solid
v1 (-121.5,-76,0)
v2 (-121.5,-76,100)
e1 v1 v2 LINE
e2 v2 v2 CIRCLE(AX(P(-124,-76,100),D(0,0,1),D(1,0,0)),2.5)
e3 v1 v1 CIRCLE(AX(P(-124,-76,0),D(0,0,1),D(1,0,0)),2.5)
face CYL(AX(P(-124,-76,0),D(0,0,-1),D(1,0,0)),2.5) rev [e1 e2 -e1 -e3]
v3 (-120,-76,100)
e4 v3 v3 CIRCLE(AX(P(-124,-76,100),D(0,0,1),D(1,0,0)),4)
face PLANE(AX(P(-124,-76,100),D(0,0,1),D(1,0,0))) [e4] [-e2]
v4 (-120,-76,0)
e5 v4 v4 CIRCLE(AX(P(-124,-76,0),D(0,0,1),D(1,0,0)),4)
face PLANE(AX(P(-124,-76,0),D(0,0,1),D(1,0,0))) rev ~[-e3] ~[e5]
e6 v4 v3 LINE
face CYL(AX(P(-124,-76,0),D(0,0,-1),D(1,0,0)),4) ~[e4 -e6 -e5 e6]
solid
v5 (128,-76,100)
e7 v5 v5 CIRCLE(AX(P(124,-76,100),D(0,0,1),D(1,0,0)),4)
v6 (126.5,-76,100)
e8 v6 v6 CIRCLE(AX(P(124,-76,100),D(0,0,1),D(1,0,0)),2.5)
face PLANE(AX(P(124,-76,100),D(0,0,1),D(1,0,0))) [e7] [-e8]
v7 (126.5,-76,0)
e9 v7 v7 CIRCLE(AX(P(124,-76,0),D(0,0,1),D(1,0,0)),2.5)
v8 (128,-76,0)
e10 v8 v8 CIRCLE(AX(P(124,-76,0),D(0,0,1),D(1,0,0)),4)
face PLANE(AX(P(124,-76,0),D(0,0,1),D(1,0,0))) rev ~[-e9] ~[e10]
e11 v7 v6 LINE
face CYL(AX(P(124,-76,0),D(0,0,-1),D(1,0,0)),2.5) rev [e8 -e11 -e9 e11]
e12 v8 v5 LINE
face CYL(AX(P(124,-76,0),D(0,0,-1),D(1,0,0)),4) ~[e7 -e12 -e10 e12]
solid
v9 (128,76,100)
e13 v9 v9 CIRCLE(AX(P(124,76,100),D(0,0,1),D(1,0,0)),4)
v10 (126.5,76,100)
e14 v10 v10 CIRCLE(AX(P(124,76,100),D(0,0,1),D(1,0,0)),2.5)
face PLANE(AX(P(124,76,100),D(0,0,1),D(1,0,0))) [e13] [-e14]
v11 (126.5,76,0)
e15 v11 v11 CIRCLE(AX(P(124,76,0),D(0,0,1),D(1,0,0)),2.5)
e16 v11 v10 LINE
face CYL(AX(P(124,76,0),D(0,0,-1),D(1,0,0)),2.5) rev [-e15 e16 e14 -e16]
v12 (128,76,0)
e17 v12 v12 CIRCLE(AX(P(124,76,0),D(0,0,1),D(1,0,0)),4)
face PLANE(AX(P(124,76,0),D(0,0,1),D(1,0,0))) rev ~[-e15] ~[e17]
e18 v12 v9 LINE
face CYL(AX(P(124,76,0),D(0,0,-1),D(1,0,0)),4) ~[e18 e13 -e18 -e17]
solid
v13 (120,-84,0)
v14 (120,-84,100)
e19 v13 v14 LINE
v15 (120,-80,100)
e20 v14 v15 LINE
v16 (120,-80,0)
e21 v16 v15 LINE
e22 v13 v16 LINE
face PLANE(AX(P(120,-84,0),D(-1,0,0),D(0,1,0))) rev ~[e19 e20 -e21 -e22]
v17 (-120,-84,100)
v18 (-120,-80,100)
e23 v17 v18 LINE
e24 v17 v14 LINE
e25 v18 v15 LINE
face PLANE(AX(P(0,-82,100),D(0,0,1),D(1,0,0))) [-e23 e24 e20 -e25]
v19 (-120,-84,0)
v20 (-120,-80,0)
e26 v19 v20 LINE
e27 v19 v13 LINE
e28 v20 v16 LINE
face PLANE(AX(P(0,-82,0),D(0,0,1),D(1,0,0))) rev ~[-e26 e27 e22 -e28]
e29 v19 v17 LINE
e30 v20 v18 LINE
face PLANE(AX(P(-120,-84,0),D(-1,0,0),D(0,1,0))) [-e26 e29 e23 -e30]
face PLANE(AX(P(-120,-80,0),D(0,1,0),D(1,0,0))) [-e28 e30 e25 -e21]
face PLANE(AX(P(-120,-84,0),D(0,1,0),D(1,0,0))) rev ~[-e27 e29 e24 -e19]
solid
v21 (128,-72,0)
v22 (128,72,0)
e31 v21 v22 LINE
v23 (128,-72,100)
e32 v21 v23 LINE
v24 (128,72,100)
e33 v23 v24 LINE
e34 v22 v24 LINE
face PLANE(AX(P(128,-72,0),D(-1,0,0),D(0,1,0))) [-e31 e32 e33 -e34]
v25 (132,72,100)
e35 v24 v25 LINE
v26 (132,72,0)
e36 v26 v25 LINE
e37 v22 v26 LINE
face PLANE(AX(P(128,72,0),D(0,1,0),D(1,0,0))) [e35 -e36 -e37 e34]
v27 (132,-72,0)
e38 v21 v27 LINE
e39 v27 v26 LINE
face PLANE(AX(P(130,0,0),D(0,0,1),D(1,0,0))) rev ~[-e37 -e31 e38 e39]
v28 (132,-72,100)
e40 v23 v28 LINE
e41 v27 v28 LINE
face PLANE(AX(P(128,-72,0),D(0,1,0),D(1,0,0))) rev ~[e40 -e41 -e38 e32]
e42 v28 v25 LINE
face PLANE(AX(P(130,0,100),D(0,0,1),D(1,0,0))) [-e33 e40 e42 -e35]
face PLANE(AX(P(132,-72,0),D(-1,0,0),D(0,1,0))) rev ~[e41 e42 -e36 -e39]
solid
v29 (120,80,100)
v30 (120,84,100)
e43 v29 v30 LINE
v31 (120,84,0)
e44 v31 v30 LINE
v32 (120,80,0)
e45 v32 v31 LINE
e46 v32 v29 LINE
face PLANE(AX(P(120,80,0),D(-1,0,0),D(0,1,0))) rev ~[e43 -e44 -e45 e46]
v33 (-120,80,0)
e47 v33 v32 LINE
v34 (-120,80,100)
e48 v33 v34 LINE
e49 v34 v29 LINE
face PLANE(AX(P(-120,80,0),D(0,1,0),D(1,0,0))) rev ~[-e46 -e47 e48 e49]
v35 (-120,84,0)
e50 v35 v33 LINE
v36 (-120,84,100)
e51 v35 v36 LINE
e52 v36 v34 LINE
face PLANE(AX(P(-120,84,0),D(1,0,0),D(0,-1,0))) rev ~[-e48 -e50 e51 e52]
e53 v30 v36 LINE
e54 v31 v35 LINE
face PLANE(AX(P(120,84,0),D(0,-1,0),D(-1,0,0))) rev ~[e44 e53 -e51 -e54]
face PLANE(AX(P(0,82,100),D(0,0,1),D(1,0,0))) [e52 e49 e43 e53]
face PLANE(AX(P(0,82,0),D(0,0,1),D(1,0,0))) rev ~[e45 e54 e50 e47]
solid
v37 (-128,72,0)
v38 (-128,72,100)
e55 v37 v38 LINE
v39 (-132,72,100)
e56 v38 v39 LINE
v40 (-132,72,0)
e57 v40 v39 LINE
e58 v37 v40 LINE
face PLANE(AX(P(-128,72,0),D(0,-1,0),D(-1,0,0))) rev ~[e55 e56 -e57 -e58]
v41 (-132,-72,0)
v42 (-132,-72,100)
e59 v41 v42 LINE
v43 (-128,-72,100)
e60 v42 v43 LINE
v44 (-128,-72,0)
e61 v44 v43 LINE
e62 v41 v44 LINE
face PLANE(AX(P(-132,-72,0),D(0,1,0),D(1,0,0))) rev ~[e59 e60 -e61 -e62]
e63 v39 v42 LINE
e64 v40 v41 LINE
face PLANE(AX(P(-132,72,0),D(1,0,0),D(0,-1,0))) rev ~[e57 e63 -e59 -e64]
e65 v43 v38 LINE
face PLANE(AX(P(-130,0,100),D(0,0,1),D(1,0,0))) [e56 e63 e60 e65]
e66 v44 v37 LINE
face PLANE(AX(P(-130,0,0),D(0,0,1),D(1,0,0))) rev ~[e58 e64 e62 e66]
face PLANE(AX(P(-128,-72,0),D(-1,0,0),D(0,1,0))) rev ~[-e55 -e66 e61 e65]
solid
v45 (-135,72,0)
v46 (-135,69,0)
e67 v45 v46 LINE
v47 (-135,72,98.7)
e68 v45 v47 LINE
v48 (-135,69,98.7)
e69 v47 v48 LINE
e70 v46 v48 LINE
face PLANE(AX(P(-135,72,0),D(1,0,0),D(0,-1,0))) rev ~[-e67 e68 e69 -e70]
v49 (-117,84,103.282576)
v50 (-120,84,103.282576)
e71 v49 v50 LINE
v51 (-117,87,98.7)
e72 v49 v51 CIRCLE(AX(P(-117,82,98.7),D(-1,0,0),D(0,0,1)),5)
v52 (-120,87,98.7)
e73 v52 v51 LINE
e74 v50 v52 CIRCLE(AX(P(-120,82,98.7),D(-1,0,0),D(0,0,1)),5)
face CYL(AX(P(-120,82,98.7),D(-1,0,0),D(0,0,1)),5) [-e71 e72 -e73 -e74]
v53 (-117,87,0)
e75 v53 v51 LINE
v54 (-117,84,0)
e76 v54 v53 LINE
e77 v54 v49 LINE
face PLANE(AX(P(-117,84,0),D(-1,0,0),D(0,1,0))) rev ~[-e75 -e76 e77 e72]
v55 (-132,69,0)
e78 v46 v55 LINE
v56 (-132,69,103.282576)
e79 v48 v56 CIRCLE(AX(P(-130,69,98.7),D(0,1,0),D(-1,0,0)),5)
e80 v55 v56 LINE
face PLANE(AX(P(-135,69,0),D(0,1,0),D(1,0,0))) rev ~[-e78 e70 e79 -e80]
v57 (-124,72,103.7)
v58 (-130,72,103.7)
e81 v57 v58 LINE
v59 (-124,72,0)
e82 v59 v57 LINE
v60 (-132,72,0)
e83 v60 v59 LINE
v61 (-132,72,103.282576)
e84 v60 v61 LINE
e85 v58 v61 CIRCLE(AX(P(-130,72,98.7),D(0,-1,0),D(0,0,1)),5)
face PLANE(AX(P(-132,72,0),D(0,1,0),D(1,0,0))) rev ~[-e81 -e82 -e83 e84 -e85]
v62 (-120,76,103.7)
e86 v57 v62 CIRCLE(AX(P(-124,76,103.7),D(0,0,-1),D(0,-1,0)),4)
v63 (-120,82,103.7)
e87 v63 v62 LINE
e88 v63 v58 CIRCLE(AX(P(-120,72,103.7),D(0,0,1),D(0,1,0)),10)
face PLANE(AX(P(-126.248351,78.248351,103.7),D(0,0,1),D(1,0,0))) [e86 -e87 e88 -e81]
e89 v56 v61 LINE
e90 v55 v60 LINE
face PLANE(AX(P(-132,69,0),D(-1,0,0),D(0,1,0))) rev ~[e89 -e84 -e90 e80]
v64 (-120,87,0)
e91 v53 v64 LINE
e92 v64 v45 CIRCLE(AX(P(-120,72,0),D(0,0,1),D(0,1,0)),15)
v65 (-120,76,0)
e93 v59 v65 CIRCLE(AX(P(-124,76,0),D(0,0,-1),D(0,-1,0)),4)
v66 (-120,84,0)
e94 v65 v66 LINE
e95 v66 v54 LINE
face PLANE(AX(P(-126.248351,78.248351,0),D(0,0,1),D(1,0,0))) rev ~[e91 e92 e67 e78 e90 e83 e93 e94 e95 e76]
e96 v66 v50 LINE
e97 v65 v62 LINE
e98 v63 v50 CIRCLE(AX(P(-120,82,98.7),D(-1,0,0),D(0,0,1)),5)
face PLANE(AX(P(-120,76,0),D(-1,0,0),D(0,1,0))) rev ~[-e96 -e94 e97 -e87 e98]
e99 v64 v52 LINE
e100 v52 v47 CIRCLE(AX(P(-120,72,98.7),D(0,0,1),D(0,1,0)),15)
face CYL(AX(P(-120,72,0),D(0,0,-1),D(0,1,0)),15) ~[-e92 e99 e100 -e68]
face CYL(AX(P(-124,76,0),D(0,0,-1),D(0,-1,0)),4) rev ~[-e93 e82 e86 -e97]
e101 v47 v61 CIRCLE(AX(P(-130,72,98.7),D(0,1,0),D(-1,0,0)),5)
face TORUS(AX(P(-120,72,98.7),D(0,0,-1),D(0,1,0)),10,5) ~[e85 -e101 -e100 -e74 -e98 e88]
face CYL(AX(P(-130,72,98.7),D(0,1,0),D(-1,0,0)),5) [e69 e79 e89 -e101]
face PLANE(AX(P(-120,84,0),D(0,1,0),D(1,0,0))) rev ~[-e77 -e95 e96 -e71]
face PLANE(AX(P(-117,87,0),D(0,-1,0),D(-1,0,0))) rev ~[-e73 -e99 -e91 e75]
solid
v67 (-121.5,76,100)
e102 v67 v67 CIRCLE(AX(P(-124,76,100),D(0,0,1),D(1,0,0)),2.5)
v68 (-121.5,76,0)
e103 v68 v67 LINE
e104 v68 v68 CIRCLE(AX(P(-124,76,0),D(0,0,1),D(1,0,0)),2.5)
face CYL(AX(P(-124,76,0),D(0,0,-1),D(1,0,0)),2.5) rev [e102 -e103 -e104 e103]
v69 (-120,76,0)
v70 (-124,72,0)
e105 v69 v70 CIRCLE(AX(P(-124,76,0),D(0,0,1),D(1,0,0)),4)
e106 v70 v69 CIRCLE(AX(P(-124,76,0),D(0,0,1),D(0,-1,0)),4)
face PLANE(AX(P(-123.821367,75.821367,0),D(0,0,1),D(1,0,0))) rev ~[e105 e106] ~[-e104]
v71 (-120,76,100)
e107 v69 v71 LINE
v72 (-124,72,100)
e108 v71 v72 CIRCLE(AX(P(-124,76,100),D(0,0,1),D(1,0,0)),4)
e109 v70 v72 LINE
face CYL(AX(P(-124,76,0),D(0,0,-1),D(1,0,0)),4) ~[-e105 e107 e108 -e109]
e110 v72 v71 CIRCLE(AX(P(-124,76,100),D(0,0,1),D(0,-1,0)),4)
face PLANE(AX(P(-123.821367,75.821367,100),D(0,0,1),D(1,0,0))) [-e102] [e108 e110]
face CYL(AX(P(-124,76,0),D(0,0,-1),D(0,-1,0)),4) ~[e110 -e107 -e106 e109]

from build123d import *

# Parameters (mm, degrees)
F0_R        = 2.5
F1_DEPTH    = 100
F0_R_2      = 4
F0_W        = 240
F0_H        = 4
F0_W_2      = 4
F0_H_2      = 144
F2_DEPTH    = 103.7
F3_T1_DEPTH = 15.5
F3_T3_DEPTH = 15.5
F3_T6_ANGLE = 90


# Not quite as in the source:
# - a fillet or chamfer that OpenCascade refuses, or shapes differently, is made with other operations: its cross-section is extruded or revolved along the edge and cut away or added


with BuildPart() as f1:
    # F0 (on Top) → F1 (new body)
    with BuildSketch(Plane.XY):
        with BuildLine():
            ThreePointArc((-124, 72), (-121.1715728753, 73.1715728753), (-120, 76))
            ThreePointArc((-120, 76), (-126.8284271247, 78.8284271247), (-124, 72))
        make_face()
        with Locations((-124, 76)):
            Circle(F0_R, mode=Mode.SUBTRACT)
    extrude(amount=F1_DEPTH)


with BuildPart() as f1b:
    # F0 (on Top) → F1, piece 2 (new body)
    with BuildSketch(Plane.XY):
        with Locations((-124, -76)):
            Circle(F0_R_2)
        with Locations((-124, -76)):
            Circle(F0_R, mode=Mode.SUBTRACT)
    extrude(amount=F1_DEPTH)


with BuildPart() as f1c:
    # F0 (on Top) → F1, piece 3 (new body)
    with BuildSketch(Plane.XY):
        with Locations((124, -76)):
            Circle(F0_R_2)
        with Locations((124, -76)):
            Circle(F0_R, mode=Mode.SUBTRACT)
    extrude(amount=F1_DEPTH)


with BuildPart() as f1d:
    # F0 (on Top) → F1, piece 4 (new body)
    with BuildSketch(Plane.XY):
        with Locations((124, 76)):
            Circle(F0_R_2)
        with Locations((124, 76)):
            Circle(F0_R, mode=Mode.SUBTRACT)
    extrude(amount=F1_DEPTH)


with BuildPart() as f1e:
    # F0 (on Top) → F1, piece 5 (new body)
    with BuildSketch(Plane.XY):
        Polygon((-120, 84), (-120, 80), (120, 80), (120, 84), (-117, 84), align=None)
    extrude(amount=F1_DEPTH)


with BuildPart() as f1f:
    # F0 (on Top) → F1, piece 6 (new body)
    with BuildSketch(Plane.XY):
        Polygon((-128, -72), (-128, 72), (-132, 72), (-132, 69), (-132, -72), align=None)
    extrude(amount=F1_DEPTH)


with BuildPart() as f1g:
    # F0 (on Top) → F1, piece 7 (new body)
    with BuildSketch(Plane.XY):
        with Locations((0, -82)):
            Rectangle(F0_W, F0_H)
    extrude(amount=F1_DEPTH)


with BuildPart() as f1h:
    # F0 (on Top) → F1, piece 8 (new body)
    with BuildSketch(Plane.XY):
        with Locations((130, 0)):
            Rectangle(F0_W_2, F0_H_2)
    extrude(amount=F1_DEPTH)


with BuildPart() as f2:
    # F0 (on Top) → F2 (new body)
    with BuildSketch(Plane.XY):
        with BuildLine():
            ThreePointArc((-124, 72), (-126.8284271247, 78.8284271247), (-120, 76))
            Line((-120, 76), (-120, 80))
            Line((-120, 80), (-120, 84))
            Line((-120, 84), (-117, 84))
            Line((-117, 84), (-117, 87))
            Line((-117, 87), (-120, 87))
            ThreePointArc((-120, 87), (-130.6066017178, 82.6066017178), (-135, 72))
            Line((-135, 72), (-135, 69))
            Line((-135, 69), (-132, 69))
            Line((-132, 69), (-132, 72))
            Line((-132, 72), (-128, 72))
            Line((-128, 72), (-124, 72))
        make_face()
    extrude(amount=F2_DEPTH)

    # F3: fillet of radius 5 on 1 edges, made by hand

    # F3_s2 → F3_t1 (cut)
    with BuildSketch(Plane.YZ.offset(-120)):
        with BuildLine():
            ThreePointArc((82, 103.7), (85.5355339059, 102.2355339059), (87, 98.7))
            Line((87, 98.7), (87, 103.7))
            Line((87, 103.7), (82, 103.7))
        make_face()
    extrude(amount=F3_T1_DEPTH, mode=Mode.SUBTRACT)

    # F3_s4 → F3_t3 (cut)
    with BuildSketch(Plane.XZ.offset(-72)):
        with BuildLine():
            ThreePointArc((-135, 98.7), (-133.5355339059, 102.2355339059), (-130, 103.7))
            Line((-130, 103.7), (-135, 103.7))
            Line((-135, 103.7), (-135, 98.7))
        make_face()
    extrude(amount=F3_T3_DEPTH, mode=Mode.SUBTRACT)

    # F3_s5 → F3_t6 (revolve, cut)
    with BuildSketch(Plane.YZ.offset(-120)):
        with BuildLine():
            ThreePointArc((82, 103.7), (85.5355339059, 102.2355339059), (87, 98.7))
            Line((87, 98.7), (87, 103.7))
            Line((87, 103.7), (82, 103.7))
        make_face()
    revolve(axis=Axis((-120, 72, 103.7), (0, 0, 1)), revolution_arc=F3_T6_ANGLE, mode=Mode.SUBTRACT)


solid = Compound([f1.part, f1b.part, f1c.part, f1d.part, f1e.part, f1f.part, f1g.part, f1h.part, f2.part])
